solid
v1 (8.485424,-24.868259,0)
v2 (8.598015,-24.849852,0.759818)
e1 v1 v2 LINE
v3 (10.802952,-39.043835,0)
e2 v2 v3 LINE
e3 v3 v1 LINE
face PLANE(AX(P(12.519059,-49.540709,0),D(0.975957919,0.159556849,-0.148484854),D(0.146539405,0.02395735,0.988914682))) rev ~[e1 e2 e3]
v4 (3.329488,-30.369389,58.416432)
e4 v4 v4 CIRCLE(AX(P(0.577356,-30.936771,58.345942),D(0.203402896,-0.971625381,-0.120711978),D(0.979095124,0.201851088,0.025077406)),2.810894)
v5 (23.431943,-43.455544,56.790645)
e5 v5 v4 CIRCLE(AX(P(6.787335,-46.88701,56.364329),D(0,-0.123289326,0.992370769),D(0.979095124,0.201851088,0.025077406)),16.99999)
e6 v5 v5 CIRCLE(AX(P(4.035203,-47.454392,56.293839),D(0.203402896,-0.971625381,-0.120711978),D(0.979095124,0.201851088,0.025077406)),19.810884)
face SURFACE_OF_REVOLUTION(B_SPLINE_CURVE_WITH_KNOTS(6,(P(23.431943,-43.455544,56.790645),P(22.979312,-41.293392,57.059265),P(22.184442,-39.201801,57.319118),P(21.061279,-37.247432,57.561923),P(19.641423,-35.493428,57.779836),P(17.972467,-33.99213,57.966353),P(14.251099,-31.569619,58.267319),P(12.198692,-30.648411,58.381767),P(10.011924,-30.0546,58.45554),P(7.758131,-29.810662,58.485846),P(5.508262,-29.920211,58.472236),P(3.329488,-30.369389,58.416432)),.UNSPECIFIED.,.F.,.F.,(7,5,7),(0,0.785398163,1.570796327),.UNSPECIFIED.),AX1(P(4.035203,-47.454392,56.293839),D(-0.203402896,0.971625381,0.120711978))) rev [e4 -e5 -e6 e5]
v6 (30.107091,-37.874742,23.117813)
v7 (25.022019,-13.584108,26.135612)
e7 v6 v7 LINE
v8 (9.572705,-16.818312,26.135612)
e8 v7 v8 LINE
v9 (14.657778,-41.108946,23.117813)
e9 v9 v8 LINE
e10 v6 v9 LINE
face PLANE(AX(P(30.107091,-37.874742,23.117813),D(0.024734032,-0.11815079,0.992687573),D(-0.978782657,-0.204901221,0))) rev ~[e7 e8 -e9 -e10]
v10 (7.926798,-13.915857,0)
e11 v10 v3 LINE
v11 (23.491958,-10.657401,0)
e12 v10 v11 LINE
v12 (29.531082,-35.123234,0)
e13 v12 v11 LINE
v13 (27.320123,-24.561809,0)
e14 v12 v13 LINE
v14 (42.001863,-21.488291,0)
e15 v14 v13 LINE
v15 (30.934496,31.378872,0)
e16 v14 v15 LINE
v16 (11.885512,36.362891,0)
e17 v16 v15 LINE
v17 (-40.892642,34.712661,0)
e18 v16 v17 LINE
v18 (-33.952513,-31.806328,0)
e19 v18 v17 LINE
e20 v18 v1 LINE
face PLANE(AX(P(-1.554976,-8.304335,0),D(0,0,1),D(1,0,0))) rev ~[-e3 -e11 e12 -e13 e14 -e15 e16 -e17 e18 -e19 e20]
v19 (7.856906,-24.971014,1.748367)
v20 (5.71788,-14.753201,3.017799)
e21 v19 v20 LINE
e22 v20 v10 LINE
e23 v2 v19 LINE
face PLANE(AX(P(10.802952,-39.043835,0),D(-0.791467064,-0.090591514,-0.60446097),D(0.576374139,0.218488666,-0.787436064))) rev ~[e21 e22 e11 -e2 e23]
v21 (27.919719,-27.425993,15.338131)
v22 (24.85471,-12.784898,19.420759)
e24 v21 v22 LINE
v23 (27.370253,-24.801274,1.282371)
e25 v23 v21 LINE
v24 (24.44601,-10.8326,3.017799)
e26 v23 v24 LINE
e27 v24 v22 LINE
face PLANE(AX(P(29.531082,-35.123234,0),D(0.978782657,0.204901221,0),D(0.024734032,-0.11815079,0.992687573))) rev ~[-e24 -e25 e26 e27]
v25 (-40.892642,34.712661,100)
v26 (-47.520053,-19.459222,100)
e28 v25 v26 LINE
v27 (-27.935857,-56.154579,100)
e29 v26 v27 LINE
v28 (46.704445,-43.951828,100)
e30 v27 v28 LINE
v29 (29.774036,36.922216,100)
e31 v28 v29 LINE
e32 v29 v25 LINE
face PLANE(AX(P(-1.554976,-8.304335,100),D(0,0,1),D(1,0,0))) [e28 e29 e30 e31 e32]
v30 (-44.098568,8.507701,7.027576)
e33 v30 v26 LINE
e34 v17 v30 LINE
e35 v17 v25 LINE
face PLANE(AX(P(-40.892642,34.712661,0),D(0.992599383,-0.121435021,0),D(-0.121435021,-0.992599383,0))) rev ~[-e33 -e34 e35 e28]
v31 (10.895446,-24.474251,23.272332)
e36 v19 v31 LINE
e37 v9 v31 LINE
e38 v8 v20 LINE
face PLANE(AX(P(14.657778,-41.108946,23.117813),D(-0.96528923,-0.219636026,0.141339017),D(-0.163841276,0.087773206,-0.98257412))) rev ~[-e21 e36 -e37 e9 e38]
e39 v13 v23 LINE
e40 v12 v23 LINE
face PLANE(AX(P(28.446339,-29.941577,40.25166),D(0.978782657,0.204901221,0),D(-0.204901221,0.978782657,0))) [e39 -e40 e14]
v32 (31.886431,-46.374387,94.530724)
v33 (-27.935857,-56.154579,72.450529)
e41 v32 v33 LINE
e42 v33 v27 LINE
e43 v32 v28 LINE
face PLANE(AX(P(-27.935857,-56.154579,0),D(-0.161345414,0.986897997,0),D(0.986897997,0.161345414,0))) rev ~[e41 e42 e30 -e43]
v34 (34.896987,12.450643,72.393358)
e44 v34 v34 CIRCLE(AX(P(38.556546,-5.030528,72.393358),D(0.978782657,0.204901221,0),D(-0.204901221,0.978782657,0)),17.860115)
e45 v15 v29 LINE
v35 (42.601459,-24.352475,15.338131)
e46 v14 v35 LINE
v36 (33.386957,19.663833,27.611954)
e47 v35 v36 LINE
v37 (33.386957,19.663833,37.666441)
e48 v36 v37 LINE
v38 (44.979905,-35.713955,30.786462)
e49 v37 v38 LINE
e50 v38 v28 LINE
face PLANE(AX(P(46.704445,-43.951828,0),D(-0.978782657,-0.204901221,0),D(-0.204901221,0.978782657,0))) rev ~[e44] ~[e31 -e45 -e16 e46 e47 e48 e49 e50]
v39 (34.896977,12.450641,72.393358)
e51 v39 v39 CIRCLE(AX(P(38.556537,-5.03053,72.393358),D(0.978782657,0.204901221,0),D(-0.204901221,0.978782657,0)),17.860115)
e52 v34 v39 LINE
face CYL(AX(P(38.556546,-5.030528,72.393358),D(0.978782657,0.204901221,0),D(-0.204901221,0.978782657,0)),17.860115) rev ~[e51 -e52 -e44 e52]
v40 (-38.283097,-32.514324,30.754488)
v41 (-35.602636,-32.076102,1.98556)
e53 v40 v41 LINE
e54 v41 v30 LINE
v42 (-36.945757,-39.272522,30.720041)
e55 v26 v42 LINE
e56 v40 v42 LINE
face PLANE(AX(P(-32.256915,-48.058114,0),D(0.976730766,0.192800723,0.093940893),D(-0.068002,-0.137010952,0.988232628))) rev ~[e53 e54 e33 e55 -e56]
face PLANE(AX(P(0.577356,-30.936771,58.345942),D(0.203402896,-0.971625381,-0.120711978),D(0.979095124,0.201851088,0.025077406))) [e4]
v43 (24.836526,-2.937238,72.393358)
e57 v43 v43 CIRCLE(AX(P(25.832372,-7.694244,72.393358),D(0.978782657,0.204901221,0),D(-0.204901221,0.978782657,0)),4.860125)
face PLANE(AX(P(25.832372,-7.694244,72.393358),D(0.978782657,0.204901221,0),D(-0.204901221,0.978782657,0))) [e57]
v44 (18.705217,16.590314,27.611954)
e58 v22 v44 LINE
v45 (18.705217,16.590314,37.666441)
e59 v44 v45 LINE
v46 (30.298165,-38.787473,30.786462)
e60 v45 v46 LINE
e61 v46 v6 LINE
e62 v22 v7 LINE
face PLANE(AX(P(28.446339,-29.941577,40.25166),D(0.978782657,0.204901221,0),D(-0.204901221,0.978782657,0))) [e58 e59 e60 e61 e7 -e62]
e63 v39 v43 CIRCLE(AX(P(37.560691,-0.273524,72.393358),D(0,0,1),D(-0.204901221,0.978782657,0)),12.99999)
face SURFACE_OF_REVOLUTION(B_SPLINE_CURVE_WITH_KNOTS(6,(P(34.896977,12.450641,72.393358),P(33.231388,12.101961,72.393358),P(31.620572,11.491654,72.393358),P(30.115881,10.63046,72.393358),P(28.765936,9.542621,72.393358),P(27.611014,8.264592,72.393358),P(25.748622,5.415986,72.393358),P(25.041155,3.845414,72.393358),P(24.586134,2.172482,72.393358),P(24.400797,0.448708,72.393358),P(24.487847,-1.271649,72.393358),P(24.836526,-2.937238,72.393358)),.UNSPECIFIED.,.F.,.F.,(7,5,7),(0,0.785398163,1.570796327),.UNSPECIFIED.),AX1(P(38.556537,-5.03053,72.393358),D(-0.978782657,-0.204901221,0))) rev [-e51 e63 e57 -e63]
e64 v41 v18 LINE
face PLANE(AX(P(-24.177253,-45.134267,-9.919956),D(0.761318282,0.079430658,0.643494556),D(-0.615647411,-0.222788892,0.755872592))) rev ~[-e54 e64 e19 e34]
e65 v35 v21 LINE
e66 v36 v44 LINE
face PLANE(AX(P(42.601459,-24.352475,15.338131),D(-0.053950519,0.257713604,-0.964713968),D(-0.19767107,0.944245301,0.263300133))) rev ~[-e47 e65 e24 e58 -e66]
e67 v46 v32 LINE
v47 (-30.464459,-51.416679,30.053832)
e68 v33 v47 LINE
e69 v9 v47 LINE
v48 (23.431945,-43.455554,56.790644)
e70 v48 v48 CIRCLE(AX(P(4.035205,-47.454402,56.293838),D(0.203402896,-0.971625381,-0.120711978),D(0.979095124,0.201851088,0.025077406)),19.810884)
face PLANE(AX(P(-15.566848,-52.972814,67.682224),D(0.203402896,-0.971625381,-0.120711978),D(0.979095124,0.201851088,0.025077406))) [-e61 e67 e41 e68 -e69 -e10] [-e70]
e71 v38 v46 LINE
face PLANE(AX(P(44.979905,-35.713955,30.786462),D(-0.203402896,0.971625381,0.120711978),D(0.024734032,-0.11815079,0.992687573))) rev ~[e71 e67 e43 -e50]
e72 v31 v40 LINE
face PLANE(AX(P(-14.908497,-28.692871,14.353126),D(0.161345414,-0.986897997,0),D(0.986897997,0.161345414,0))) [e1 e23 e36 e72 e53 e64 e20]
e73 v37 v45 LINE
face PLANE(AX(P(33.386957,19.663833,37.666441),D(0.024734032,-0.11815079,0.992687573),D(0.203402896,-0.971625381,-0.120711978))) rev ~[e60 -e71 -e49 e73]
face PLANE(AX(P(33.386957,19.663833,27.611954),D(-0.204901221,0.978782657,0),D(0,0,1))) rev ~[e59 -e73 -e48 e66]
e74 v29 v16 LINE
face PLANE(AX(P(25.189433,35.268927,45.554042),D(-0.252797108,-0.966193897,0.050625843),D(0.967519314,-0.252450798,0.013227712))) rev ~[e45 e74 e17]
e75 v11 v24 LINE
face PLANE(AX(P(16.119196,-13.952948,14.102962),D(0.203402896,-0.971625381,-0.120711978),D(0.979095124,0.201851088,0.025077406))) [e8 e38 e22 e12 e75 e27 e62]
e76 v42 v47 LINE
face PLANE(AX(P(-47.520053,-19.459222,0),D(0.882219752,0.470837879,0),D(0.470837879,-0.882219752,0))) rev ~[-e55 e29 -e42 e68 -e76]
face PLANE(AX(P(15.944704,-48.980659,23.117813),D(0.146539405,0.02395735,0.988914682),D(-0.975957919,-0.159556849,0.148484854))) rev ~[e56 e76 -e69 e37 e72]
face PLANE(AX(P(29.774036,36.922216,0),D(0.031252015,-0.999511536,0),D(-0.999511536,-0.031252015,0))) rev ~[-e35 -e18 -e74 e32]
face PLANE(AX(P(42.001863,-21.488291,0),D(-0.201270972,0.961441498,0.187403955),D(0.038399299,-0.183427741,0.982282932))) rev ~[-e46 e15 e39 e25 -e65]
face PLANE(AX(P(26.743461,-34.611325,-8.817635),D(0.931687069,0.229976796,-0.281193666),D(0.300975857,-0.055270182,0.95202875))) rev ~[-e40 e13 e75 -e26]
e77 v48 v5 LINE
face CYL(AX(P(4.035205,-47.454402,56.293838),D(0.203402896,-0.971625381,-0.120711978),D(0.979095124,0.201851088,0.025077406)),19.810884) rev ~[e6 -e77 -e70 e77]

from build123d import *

# Parameters (mm, degrees)
F1_DEPTH  = 100
F6_DEPTH  = 25
F7_DEPTH  = 15
F9_DEPTH  = 25
F3_R      = 17.8601151659
F10_DEPTH = 13
F11_R     = 12.99999
F13_DEPTH = 25
F14_DEPTH = 90
F12_R     = 19.8108840593
F15_DEPTH = 17
F16_R     = 16.99999
F18_DEPTH = 25


# Not quite as in the source:
# - a fillet or chamfer is up to 0.001 mm smaller than in the source, because OpenCascade refuses the exact size


with BuildPart() as f1:
    # F0 (on Top) → F1 (new body)
    with BuildSketch(Plane.XY):
        Polygon((-47.5200526416, -19.4592215121), (-27.9358569533, -56.1545789242), (46.7044450343, -43.9518280327), (29.7740362585, 36.9222164154), (-40.8926419914, 34.7126610577), align=None)
    extrude(amount=F1_DEPTH)

    # F5 (on 3pt) → F6 (cut)
    with BuildSketch(Plane(origin=(9.6412332648, 36.848921293, -1.9307798529), x_dir=(0.9675193136, -0.2524507981, 0.0132277119), z_dir=(-0.2527971081, -0.9661938968, 0.0506258432))):
        Polygon((22.0081010682, 1.6419123086), (20.808683311, 101.7949787998), (2.3196212658, 1.9027031079), align=None)
    extrude(amount=-F6_DEPTH, mode=Mode.SUBTRACT)

    # F3 (on face) → F7 (cut)
    with BuildSketch(Plane(origin=(35.9288773181, 7.5214561607, 0), x_dir=(-0.2049012214, 0.9787826569, 0), z_dir=(0.9787826569, 0.2049012214, 0))):
        Polygon((-44.1726371646, 30.7864621282), (-52.589084849, 100), (-52.589084849, 0), (-29.6385996044, 0), (-32.5648710132, 15.3381312266), (12.4055901776, 27.6119541377), (12.4055901776, 37.6664411777), align=None)
    extrude(amount=-F7_DEPTH, mode=Mode.SUBTRACT)

    # F8 (on face) → F9 (cut)
    with BuildSketch(Plane(origin=(8.1632362237, -38.9945652191, -4.8445740248), x_dir=(0.979095124, 0.2018510885, 0.0250774059), z_dir=(0.2034028962, -0.9716253806, -0.1207119775))):
        Polygon((39.3641106636, 104.6558680882), (-79.5409610954, 107.6664552623), (-81.3024698416, 37.9594929491), (22.60753629, 35.3336665102), (24.2297143871, 99.5269938077), align=None)
        Polygon((22.60753629, 35.3336665102), (-81.3024698416, 37.9594929491), (-82.4683913698, -8.1787100022), (37.6027492107, -11.21293151), (37.6027492107, 34.9547345092), align=None)
    extrude(amount=F9_DEPTH, mode=Mode.SUBTRACT)

    # F3 (on face) → F10 (cut)
    with BuildSketch(Plane(origin=(35.9288773181, 7.5214561607, 0), x_dir=(-0.2049012214, 0.9787826569, 0), z_dir=(0.9787826569, 0.2049012214, 0))):
        with Locations((-12.8240771592, 72.3933577538)):
            Circle(F3_R)
    extrude(amount=-F10_DEPTH, mode=Mode.SUBTRACT)

    # F11 (radius 13 in the source; OpenCascade refuses exactly that, so slightly less here)
    f11_edges = [f1.edges().sort_by_distance(p)[0] for p in [
        (29.491931, -25.175415, 72.393358),
    ]]
    fillet(f11_edges, radius=F11_R)

    # F12 (on face) → F13 (cut)
    with BuildSketch(Plane(origin=(8.1632362237, -38.9945652191, -4.8445740248), x_dir=(0.979095124, 0.2018510885, 0.0250774059), z_dir=(0.2034028962, -0.9716253806, -0.1207119775))):
        Polygon((21.8240755779, 4.3303198355), (22.4123828022, 27.6109930646), (6.6332079808, 28.009735938), (2.6960770767, 4.8136881468), align=None)
        Polygon((18.9769355737, -4.4831562801), (21.8240755779, 4.3303198355), (2.6960770767, 4.8136881468), (9.4391942611, -4.4458445128), align=None)
    extrude(amount=-F13_DEPTH, mode=Mode.SUBTRACT)

    # F12 (on face) → F14 (cut)
    with BuildSketch(Plane(origin=(8.1632362237, -38.9945652191, -4.8445740248), x_dir=(0.979095124, 0.2018510885, 0.0250774059), z_dir=(0.2034028962, -0.9716253806, -0.1207119775))):
        Polygon((-50.4545168754, 2.399114297), (-41.2831704405, 5.9250524436), (-47.9467762851, 101.636191148), align=None)
        Polygon((-33.0309979628, -4.2797005717), (-41.2831704405, 5.9250524436), (-50.4545168754, 2.399114297), align=None)
    extrude(amount=-F14_DEPTH, mode=Mode.SUBTRACT)

    # F12 (on face) → F15 (cut)
    with BuildSketch(Plane(origin=(8.1632362237, -38.9945652191, -4.8445740248), x_dir=(0.979095124, 0.2018510885, 0.0250774059), z_dir=(0.2034028962, -0.9716253806, -0.1207119775))):
        with Locations((-4.2161699384, 61.7149807513)):
            Circle(F12_R)
    extrude(amount=-F15_DEPTH, mode=Mode.SUBTRACT)

    # F16 (radius 17 in the source; OpenCascade refuses exactly that, so slightly less here)
    f16_edges = [f1.edges().sort_by_distance(p)[0] for p in [
        (-18.819384, -34.935619, 57.849136),
    ]]
    fillet(f16_edges, radius=F16_R)

    # F17 (on face) → F18 (cut)
    with BuildSketch(Plane(origin=(8.2143401196, -50.2444762342, 0), x_dir=(0.9868979975, 0.1613454139, 0), z_dir=(0.1613454139, -0.9868979975, 0))):
        Polygon((7.8329915962, 23.1178128028), (-44.1760422775, 30.926933164), (-42.148109545, 7.0275762015), (-39.5882407468, 0), (4.361868039, 0), align=None)
    extrude(amount=-F18_DEPTH, mode=Mode.SUBTRACT)


solid = f1.part
